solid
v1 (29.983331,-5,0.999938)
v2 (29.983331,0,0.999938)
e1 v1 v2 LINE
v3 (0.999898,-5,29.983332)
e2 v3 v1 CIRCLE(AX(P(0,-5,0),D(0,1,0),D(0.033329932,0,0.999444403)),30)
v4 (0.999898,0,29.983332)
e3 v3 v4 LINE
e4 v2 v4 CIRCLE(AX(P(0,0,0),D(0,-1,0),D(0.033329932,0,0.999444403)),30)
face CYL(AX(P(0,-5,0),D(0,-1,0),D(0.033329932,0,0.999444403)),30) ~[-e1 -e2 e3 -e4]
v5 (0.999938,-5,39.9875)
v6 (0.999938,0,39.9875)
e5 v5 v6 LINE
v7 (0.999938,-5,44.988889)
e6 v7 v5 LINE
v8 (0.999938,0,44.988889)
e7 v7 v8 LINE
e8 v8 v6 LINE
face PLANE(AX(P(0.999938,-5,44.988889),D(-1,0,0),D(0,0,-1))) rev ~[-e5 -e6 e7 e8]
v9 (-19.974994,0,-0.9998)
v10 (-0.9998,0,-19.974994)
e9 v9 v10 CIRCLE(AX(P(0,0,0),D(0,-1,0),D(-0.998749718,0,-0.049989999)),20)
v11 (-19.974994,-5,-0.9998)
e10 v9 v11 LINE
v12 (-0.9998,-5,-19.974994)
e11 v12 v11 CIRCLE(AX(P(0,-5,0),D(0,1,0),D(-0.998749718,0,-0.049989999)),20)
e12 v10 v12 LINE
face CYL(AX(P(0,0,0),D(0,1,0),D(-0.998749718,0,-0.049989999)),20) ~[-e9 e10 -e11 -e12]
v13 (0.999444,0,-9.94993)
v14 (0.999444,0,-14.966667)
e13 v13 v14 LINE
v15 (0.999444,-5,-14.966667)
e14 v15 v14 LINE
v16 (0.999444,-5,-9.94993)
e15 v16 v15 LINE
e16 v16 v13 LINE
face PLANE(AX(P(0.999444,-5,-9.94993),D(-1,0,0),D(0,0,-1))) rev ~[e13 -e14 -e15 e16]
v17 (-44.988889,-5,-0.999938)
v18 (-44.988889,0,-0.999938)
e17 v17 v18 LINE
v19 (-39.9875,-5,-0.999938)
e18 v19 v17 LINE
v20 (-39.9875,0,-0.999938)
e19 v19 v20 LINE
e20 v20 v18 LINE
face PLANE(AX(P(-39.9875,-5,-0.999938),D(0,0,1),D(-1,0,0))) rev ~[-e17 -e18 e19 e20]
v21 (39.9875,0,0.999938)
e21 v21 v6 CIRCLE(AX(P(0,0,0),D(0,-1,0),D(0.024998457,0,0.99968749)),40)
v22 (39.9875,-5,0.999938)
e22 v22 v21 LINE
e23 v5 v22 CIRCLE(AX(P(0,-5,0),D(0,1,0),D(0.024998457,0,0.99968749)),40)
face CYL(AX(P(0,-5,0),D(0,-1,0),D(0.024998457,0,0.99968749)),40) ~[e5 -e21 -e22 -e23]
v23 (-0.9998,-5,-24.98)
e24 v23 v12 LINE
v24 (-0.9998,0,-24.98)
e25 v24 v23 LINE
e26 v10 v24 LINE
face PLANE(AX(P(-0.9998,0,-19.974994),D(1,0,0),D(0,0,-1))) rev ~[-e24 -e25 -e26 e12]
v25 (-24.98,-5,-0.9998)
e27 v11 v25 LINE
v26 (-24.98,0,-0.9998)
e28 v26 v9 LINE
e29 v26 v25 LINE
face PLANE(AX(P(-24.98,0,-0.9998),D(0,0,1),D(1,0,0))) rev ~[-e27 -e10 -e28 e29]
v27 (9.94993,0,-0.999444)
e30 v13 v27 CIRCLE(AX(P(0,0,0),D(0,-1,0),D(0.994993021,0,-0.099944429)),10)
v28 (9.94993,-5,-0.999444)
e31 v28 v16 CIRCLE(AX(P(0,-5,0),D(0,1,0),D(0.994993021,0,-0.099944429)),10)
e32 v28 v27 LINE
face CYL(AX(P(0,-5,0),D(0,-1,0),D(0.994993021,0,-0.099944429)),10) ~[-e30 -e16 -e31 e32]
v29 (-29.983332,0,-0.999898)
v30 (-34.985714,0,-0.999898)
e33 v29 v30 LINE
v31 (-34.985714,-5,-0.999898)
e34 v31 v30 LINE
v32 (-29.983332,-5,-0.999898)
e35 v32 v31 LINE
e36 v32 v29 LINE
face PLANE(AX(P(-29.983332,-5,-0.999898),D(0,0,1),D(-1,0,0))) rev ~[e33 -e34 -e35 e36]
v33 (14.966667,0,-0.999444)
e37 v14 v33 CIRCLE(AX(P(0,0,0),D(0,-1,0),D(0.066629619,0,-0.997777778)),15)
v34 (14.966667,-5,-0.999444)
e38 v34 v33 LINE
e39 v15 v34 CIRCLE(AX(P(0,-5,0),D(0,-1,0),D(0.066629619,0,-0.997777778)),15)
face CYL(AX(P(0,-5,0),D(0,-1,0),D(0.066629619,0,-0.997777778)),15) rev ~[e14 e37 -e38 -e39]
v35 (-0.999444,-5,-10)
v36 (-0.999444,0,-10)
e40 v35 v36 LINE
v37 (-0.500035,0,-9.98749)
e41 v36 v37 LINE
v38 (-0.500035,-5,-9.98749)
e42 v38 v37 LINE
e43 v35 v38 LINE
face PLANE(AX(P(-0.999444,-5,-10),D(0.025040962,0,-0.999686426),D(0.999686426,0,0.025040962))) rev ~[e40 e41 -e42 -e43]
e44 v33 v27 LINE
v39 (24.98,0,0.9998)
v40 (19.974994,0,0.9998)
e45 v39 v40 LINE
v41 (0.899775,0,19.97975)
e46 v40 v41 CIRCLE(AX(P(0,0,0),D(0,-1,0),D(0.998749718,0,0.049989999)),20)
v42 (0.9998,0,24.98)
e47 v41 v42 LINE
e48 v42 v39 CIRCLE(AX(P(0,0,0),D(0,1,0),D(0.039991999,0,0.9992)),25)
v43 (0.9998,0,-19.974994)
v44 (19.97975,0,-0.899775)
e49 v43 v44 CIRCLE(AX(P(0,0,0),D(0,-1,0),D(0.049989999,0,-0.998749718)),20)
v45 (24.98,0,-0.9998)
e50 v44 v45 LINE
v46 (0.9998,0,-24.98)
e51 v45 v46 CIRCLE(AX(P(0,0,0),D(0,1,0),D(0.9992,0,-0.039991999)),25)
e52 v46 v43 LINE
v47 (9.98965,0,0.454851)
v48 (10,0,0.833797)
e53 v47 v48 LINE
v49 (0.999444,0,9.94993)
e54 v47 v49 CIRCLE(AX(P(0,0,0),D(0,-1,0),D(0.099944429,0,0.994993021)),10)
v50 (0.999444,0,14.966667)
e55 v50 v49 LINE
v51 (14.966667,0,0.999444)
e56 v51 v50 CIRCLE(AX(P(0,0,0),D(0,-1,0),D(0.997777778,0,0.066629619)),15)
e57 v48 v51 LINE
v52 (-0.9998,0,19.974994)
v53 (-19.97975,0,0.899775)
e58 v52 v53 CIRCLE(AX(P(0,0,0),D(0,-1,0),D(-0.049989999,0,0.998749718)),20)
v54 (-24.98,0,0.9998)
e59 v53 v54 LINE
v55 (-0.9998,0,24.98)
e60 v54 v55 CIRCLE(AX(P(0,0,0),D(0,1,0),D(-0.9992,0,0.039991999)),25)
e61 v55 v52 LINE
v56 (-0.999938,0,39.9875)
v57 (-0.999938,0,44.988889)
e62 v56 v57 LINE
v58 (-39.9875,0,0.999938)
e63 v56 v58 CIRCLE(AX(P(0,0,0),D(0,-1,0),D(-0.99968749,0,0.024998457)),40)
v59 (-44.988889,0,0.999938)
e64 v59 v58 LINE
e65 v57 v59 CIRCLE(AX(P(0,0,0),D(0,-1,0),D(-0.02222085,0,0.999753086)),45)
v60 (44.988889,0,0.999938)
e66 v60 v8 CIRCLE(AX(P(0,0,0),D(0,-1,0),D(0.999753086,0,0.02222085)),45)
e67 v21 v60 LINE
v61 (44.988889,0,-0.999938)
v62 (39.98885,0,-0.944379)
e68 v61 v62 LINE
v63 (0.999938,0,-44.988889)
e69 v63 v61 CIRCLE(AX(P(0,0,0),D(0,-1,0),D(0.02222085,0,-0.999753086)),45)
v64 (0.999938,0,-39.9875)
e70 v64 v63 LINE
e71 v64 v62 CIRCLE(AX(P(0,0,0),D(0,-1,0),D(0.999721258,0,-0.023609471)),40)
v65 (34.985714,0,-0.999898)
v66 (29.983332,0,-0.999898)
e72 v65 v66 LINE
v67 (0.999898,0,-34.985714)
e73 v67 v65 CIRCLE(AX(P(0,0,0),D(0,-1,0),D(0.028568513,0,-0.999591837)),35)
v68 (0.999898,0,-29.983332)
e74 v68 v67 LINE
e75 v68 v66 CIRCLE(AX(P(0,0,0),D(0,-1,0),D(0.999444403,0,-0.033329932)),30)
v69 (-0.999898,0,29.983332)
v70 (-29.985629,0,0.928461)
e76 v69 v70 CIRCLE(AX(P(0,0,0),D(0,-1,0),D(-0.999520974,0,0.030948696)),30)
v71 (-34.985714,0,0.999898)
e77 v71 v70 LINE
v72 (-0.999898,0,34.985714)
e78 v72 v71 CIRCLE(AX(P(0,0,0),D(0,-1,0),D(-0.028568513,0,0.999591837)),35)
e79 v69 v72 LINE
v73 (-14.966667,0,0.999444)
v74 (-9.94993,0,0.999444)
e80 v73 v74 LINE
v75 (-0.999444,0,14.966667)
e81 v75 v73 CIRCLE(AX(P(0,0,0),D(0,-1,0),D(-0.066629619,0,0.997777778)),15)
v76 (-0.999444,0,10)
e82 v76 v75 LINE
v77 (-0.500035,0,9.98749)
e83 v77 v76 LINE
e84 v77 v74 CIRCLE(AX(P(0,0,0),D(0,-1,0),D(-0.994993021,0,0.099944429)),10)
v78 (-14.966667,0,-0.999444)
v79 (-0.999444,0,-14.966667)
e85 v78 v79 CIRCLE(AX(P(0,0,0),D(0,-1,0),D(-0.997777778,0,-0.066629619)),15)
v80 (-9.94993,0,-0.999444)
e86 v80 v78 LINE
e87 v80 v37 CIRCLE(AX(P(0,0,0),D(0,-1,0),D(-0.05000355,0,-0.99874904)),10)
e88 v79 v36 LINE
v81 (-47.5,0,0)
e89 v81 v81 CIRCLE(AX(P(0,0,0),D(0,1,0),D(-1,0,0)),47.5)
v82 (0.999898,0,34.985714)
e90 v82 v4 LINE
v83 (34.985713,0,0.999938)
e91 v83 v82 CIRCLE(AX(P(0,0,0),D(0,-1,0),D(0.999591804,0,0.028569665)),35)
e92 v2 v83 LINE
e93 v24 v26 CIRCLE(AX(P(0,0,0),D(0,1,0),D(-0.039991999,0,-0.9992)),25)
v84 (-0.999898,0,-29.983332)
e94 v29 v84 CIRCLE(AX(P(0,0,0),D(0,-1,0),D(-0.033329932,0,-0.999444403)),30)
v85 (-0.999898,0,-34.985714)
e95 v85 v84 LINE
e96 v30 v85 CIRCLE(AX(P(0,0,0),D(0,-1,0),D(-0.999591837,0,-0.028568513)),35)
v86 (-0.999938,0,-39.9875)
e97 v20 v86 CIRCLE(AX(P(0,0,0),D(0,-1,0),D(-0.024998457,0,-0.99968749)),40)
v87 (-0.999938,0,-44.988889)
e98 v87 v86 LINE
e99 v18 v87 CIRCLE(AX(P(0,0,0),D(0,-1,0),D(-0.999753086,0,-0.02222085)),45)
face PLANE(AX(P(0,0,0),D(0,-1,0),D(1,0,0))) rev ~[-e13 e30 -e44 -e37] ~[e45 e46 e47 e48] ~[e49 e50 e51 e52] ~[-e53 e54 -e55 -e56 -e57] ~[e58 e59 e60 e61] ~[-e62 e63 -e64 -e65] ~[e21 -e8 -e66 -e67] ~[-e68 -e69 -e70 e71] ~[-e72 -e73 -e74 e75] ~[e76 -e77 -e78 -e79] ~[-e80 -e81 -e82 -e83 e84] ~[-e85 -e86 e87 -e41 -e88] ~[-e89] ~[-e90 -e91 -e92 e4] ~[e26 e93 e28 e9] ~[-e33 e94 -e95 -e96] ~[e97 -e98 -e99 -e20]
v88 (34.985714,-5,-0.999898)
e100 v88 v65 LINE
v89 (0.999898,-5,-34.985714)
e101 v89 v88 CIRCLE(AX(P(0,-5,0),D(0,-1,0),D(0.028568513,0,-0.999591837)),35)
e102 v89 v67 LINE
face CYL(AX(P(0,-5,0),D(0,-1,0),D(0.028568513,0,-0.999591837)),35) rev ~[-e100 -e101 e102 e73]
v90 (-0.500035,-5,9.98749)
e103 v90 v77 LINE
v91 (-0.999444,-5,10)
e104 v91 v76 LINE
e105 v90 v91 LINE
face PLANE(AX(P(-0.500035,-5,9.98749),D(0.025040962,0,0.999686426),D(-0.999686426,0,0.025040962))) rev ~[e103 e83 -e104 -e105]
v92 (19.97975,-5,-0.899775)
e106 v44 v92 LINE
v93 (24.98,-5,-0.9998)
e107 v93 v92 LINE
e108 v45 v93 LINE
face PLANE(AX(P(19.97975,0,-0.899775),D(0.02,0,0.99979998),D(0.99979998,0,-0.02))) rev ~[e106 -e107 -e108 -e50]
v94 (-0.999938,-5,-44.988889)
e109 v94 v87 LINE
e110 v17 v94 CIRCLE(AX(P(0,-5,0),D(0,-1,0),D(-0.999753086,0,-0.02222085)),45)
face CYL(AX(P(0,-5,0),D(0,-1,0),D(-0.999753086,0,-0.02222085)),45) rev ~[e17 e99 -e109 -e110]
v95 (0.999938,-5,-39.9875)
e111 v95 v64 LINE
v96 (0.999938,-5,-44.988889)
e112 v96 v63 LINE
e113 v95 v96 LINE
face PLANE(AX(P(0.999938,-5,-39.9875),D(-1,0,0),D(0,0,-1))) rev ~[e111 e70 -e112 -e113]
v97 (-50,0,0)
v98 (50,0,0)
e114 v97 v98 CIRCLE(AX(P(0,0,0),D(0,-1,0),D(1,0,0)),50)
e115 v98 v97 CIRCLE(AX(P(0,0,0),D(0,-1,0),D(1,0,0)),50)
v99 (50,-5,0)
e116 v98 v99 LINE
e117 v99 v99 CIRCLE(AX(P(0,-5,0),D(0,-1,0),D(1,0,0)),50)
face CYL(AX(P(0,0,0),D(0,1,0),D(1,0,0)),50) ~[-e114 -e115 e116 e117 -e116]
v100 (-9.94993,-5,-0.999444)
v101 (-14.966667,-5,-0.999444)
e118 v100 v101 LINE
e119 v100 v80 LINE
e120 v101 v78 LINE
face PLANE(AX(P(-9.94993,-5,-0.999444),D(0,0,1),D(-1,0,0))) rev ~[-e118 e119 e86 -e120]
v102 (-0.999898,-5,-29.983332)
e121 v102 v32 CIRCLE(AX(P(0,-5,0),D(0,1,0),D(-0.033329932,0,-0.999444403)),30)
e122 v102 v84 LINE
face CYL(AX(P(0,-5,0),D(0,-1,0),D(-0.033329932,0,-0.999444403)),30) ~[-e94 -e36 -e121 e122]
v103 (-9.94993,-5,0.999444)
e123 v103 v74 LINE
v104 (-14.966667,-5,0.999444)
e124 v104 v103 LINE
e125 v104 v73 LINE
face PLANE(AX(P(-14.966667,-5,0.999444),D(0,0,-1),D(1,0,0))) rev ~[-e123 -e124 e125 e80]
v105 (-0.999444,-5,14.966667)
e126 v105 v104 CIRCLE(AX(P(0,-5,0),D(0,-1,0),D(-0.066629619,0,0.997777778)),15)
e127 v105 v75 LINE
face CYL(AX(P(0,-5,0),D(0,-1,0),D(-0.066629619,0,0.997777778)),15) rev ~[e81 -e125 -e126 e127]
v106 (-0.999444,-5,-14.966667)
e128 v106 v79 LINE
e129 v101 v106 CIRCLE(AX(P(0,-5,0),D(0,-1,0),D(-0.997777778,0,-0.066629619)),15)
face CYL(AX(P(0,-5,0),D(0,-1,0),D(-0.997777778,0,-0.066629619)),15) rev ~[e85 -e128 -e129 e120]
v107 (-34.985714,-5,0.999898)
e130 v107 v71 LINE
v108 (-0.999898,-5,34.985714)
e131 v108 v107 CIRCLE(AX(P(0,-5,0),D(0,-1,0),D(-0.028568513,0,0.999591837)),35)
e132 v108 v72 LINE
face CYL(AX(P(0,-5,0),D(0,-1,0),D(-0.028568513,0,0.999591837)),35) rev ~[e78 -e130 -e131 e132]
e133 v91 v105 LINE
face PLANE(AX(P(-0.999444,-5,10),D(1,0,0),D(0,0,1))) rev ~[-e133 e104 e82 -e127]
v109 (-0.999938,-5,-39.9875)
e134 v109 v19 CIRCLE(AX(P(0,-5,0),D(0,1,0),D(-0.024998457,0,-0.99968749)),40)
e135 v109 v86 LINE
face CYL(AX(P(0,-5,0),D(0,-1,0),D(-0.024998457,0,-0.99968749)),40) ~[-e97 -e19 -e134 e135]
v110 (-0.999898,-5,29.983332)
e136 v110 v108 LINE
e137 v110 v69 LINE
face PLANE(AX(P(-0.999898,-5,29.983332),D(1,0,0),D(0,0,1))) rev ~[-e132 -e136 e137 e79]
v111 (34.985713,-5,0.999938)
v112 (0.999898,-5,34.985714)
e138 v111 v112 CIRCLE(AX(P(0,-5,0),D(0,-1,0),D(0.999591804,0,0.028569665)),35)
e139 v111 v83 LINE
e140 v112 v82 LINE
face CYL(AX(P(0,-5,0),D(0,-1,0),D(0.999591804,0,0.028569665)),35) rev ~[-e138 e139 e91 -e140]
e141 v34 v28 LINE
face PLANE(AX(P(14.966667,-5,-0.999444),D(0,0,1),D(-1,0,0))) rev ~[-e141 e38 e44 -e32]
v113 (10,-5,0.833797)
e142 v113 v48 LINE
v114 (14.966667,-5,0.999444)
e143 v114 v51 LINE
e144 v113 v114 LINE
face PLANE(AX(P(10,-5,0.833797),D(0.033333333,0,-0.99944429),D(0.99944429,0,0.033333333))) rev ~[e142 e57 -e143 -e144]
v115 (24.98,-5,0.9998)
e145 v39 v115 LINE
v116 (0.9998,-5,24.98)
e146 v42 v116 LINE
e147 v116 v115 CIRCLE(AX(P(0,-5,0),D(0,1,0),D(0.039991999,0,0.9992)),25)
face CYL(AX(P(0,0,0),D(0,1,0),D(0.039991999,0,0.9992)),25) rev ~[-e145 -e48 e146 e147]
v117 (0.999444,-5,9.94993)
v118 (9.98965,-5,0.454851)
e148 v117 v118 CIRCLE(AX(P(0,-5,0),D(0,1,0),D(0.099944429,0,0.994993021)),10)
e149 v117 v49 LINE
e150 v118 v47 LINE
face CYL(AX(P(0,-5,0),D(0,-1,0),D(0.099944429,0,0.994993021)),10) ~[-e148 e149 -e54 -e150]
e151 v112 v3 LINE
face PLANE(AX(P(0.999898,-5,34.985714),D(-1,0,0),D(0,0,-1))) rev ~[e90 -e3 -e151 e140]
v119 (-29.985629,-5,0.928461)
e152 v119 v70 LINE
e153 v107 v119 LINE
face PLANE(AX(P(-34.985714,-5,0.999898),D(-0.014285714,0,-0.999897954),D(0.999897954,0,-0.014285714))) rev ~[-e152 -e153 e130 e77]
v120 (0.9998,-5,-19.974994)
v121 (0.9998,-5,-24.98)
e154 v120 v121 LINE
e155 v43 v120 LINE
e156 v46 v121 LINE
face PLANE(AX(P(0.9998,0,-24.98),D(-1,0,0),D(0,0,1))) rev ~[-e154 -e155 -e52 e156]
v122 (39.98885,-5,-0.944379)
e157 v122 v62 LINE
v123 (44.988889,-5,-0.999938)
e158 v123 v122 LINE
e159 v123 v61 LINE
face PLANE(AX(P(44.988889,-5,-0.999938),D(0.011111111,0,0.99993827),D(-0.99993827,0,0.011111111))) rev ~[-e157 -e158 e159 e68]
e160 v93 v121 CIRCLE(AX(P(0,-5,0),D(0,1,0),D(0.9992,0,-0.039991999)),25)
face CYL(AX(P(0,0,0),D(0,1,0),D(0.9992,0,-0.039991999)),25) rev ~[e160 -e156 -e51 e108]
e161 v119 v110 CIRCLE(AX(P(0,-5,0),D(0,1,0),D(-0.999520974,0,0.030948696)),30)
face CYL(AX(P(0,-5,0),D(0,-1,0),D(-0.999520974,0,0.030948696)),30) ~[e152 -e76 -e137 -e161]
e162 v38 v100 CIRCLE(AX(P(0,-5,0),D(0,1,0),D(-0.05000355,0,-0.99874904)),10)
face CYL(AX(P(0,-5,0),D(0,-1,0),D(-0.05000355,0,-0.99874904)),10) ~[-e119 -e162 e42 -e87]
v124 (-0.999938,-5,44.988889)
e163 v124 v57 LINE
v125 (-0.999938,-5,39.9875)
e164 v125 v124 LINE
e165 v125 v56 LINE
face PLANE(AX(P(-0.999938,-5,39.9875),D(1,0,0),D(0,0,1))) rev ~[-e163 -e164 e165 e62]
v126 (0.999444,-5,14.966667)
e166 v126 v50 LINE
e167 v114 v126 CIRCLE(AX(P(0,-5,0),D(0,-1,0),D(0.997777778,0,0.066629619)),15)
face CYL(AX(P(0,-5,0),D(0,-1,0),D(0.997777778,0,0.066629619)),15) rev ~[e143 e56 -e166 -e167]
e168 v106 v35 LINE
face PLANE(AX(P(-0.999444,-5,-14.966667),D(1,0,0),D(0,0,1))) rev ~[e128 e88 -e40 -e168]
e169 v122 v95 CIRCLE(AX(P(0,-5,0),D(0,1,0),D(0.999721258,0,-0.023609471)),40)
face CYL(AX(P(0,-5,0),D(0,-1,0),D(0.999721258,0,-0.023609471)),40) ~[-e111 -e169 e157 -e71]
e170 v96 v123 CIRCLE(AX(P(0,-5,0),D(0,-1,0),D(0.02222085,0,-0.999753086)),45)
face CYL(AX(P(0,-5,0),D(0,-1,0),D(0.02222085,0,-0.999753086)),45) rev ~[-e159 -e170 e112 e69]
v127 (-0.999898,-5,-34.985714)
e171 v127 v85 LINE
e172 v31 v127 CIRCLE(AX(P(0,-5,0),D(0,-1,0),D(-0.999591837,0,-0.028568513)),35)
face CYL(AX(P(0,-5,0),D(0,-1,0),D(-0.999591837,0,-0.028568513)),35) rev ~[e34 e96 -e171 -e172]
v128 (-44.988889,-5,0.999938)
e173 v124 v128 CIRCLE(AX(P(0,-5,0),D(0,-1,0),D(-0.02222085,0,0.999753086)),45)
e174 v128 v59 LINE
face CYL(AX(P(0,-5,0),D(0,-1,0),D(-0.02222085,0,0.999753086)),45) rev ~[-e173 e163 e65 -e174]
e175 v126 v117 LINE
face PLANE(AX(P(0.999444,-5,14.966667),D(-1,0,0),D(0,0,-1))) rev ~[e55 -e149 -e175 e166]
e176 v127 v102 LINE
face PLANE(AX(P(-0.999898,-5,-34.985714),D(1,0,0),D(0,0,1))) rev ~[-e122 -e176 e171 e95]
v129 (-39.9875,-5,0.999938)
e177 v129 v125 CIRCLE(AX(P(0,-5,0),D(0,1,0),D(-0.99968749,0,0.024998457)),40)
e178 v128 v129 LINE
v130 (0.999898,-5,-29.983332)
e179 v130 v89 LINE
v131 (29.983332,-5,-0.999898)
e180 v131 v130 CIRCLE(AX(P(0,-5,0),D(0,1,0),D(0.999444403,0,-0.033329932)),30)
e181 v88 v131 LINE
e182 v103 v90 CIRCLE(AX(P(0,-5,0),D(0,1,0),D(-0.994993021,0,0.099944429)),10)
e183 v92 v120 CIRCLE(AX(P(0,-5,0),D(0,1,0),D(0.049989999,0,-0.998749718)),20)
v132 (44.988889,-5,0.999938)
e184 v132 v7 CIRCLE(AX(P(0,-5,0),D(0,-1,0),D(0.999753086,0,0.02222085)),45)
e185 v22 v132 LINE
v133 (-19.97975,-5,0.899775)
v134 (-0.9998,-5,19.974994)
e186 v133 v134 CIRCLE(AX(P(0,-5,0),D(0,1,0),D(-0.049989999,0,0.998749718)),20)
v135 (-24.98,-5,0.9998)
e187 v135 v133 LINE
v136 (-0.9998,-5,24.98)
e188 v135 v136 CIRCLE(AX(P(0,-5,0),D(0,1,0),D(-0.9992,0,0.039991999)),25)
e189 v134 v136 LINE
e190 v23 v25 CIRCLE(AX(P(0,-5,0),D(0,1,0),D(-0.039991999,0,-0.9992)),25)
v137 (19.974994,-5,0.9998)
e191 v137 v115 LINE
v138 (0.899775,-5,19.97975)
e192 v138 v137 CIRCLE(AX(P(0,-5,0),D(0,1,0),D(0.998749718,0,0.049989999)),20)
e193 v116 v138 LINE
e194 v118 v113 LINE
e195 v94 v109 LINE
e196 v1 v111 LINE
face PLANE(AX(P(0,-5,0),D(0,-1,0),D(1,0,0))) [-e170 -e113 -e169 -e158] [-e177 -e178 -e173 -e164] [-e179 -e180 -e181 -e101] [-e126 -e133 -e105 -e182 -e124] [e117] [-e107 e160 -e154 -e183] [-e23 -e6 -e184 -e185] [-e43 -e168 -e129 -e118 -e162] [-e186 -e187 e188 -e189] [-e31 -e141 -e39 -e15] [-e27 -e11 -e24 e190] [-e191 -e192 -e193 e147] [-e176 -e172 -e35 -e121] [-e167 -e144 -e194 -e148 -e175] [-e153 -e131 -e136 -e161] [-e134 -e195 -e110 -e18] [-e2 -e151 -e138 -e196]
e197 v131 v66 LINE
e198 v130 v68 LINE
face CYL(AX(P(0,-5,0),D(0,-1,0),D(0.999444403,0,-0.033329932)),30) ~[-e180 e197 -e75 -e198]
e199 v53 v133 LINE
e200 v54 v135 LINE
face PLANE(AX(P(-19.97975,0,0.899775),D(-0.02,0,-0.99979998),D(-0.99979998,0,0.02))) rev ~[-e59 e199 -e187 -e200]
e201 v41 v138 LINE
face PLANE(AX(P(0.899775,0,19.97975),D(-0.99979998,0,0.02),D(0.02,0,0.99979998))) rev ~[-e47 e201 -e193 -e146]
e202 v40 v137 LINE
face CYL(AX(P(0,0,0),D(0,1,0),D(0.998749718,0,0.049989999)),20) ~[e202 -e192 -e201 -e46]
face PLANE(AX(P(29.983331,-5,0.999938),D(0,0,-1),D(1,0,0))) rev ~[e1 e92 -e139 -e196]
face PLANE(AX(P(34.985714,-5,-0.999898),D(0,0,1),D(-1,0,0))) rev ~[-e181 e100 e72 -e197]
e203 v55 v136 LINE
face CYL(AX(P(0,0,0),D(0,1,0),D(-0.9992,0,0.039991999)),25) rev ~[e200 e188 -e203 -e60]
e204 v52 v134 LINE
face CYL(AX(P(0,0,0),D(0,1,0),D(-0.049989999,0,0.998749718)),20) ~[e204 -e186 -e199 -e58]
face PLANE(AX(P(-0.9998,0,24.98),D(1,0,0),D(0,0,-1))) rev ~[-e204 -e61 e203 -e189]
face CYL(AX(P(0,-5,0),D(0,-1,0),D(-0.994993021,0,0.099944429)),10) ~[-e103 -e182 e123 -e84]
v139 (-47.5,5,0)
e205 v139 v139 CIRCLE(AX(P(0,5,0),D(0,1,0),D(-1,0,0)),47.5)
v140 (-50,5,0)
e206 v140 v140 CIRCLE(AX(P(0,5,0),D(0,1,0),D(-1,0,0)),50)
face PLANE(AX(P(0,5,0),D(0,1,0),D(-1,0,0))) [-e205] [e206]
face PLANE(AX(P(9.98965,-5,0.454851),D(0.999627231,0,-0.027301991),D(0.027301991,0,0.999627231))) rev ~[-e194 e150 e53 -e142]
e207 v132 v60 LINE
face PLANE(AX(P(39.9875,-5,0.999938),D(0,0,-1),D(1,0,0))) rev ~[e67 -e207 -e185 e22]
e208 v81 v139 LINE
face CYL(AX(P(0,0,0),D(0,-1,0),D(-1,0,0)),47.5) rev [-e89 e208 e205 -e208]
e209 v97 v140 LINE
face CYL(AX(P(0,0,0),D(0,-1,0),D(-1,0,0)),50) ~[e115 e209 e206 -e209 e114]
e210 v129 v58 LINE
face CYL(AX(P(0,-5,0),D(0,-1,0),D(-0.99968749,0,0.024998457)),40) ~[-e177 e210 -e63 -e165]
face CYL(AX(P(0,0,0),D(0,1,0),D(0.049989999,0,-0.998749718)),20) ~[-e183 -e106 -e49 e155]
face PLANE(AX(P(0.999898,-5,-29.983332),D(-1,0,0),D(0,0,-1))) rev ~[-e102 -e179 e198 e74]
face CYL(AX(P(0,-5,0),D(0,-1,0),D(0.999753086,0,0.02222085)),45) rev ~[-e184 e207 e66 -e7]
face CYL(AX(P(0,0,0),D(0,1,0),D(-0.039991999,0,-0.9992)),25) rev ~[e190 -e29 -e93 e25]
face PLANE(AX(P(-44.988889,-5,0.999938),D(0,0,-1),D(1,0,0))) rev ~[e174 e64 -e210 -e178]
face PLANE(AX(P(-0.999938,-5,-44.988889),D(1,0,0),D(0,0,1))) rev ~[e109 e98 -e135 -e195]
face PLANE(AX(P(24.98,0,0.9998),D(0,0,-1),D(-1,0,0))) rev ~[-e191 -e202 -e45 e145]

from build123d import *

# Parameters (mm, degrees)
F0_R      = 50
F1_DEPTH  = 5
F3_DEPTH  = 25
F5_DEPTH  = 25
F7_DEPTH  = 25
F9_DEPTH  = 25
F10_R     = 50
F10_R_2   = 47.5
F11_DEPTH = 5


with BuildPart() as f1:
    # F0 (on Front) → F1 (new body)
    with BuildSketch(Plane.XZ):
        Circle(F0_R)
    extrude(amount=F1_DEPTH)

    # F2 (on face) → F3 (cut)
    with BuildSketch(Plane.XZ.offset(5)):
        with BuildLine():
            Line((39.98749959, 0.9999382697), (44.9888888889, 0.9999382697))
            ThreePointArc((44.9888888889, 0.9999382697), (31.8198051534, 31.8198051534), (0.9999382697, 44.9888888889))
            Line((0.9999382697, 44.9888888889), (0.9999382697, 39.98749959))
            ThreePointArc((0.9999382697, 39.98749959), (28.2842712475, 28.2842712475), (39.98749959, 0.9999382697))
        make_face()
        with BuildLine():
            ThreePointArc((0.9999382697, -44.9888888889), (31.8198051534, -31.8198051534), (44.9888888889, -0.9999382697))
            Line((44.9888888889, -0.9999382697), (39.9888503033, -0.9443788557))
            ThreePointArc((39.9888503033, -0.9443788557), (28.3039134456, -28.2646153992), (0.9999382697, -39.98749959))
            Line((0.9999382697, -39.98749959), (0.9999382697, -44.9888888889))
        make_face()
        with BuildLine():
            Line((-0.9999382697, 39.98749959), (-0.9999382697, 44.9888888889))
            ThreePointArc((-0.9999382697, 44.9888888889), (-31.8198051534, 31.8198051534), (-44.9888888889, 0.9999382697))
            Line((-44.9888888889, 0.9999382697), (-39.98749959, 0.9999382697))
            ThreePointArc((-39.98749959, 0.9999382697), (-28.2842712475, 28.2842712475), (-0.9999382697, 39.98749959))
        make_face()
        with BuildLine():
            ThreePointArc((-44.9888888889, -0.9999382697), (-31.8198051534, -31.8198051534), (-0.9999382697, -44.9888888889))
            Line((-0.9999382697, -44.9888888889), (-0.9999382697, -39.98749959))
            ThreePointArc((-0.9999382697, -39.98749959), (-28.2842712475, -28.2842712475), (-39.98749959, -0.9999382697))
            Line((-39.98749959, -0.9999382697), (-44.9888888889, -0.9999382697))
        make_face()
    extrude(amount=-F3_DEPTH, mode=Mode.SUBTRACT)

    # F4 (on face) → F5 (cut)
    with BuildSketch(Plane.XZ.offset(5)):
        with BuildLine():
            Line((-0.999897954, 29.9833321044), (-0.999897954, 34.9857142857))
            ThreePointArc((-0.999897954, 34.9857142857), (-24.7487373415, 24.7487373415), (-34.9857142857, 0.999897954))
            Line((-34.9857142857, 0.999897954), (-29.9856292313, 0.9284608776))
            ThreePointArc((-29.9856292313, 0.9284608776), (-21.2384582595, 21.1879185094), (-0.999897954, 29.9833321044))
        make_face()
        with BuildLine():
            Line((-29.9833321044, -0.999897954), (-34.9857142857, -0.999897954))
            ThreePointArc((-34.9857142857, -0.999897954), (-24.7487373415, -24.7487373415), (-0.999897954, -34.9857142857))
            Line((-0.999897954, -34.9857142857), (-0.999897954, -29.9833321044))
            ThreePointArc((-0.999897954, -29.9833321044), (-21.2132034356, -21.2132034356), (-29.9833321044, -0.999897954))
        make_face()
        with BuildLine():
            ThreePointArc((0.999897954, -34.9857142857), (24.7487373415, -24.7487373415), (34.9857142857, -0.999897954))
            Line((34.9857142857, -0.999897954), (29.9833321044, -0.999897954))
            ThreePointArc((29.9833321044, -0.999897954), (21.2132034356, -21.2132034356), (0.999897954, -29.9833321044))
            Line((0.999897954, -29.9833321044), (0.999897954, -34.9857142857))
        make_face()
        with BuildLine():
            ThreePointArc((34.9857131335, 0.9999382697), (24.7487230819, 24.7487516011), (0.999897954, 34.9857142857))
            Line((0.999897954, 34.9857142857), (0.999897954, 29.9833321044))
            ThreePointArc((0.999897954, 29.9833321044), (21.2131891739, 21.2132176973), (29.9833307599, 0.9999382697))
            Line((29.9833307599, 0.9999382697), (34.9857131335, 0.9999382697))
        make_face()
    extrude(amount=-F5_DEPTH, mode=Mode.SUBTRACT)

    # F6 (on face) → F7 (cut)
    with BuildSketch(Plane(origin=(0, 0, 0), x_dir=(-1, 0, 0), z_dir=(0, 1, 0))):
        with BuildLine():
            Line((19.9797498734, 0.8997749705), (24.98, 0.99979998))
            ThreePointArc((24.98, 0.99979998), (17.6776695297, 17.6776695297), (0.99979998, 24.98))
            Line((0.99979998, 24.98), (0.99979998, 19.974994368))
            ThreePointArc((0.99979998, 19.974994368), (14.1774954339, 14.106687181), (19.9797498734, 0.8997749705))
        make_face()
        with BuildLine():
            ThreePointArc((0.99979998, -24.98), (17.6776695297, -17.6776695297), (24.98, -0.99979998))
            Line((24.98, -0.99979998), (19.974994368, -0.99979998))
            ThreePointArc((19.974994368, -0.99979998), (14.1421356237, -14.1421356237), (0.99979998, -19.974994368))
            Line((0.99979998, -19.974994368), (0.99979998, -24.98))
        make_face()
        with BuildLine():
            ThreePointArc((-24.98, -0.99979998), (-17.6776695297, -17.6776695297), (-0.99979998, -24.98))
            Line((-0.99979998, -24.98), (-0.99979998, -19.974994368))
            ThreePointArc((-0.99979998, -19.974994368), (-14.1774954339, -14.106687181), (-19.9797498734, -0.8997749705))
            Line((-19.9797498734, -0.8997749705), (-24.98, -0.99979998))
        make_face()
        with BuildLine():
            Line((-0.8997749705, 19.9797498734), (-0.99979998, 24.98))
            ThreePointArc((-0.99979998, 24.98), (-17.6776695297, 17.6776695297), (-24.98, 0.99979998))
            Line((-24.98, 0.99979998), (-19.974994368, 0.99979998))
            ThreePointArc((-19.974994368, 0.99979998), (-14.106687181, 14.1774954339), (-0.8997749705, 19.9797498734))
        make_face()
    extrude(amount=-F7_DEPTH, mode=Mode.SUBTRACT)

    # F8 (on face) → F9 (cut)
    with BuildSketch(Plane.XZ.offset(5)):
        with BuildLine():
            Line((-0.99944429, 10), (-0.99944429, 14.9666666667))
            ThreePointArc((-0.99944429, 14.9666666667), (-10.6066017178, 10.6066017178), (-14.9666666667, 0.99944429))
            Line((-14.9666666667, 0.99944429), (-9.9499302063, 0.99944429))
            ThreePointArc((-9.9499302063, 0.99944429), (-6.8917841678, 7.2459168492), (-0.5000354957, 9.9874904006))
            Line((-0.5000354957, 9.9874904006), (-0.99944429, 10))
        make_face()
        with BuildLine():
            Line((10, 0.8337966825), (14.9666666667, 0.99944429))
            ThreePointArc((14.9666666667, 0.99944429), (10.6066017178, 10.6066017178), (0.99944429, 14.9666666667))
            Line((0.99944429, 14.9666666667), (0.99944429, 9.9499302063))
            ThreePointArc((0.99944429, 9.9499302063), (7.2614861704, 6.8753777058), (9.989650171, 0.4548510314))
            Line((9.989650171, 0.4548510314), (10, 0.8337966825))
        make_face()
        with BuildLine():
            ThreePointArc((0.99944429, -14.9666666667), (10.6066017178, -10.6066017178), (14.9666666667, -0.99944429))
            Line((14.9666666667, -0.99944429), (9.9499302063, -0.99944429))
            ThreePointArc((9.9499302063, -0.99944429), (7.0710678119, -7.0710678119), (0.99944429, -9.9499302063))
            Line((0.99944429, -9.9499302063), (0.99944429, -14.9666666667))
        make_face()
        with BuildLine():
            ThreePointArc((-14.9666666667, -0.99944429), (-10.6066017178, -10.6066017178), (-0.99944429, -14.9666666667))
            Line((-0.99944429, -14.9666666667), (-0.99944429, -10))
            Line((-0.99944429, -10), (-0.5000354957, -9.9874904006))
            ThreePointArc((-0.5000354957, -9.9874904006), (-6.8917841678, -7.2459168492), (-9.9499302063, -0.99944429))
            Line((-9.9499302063, -0.99944429), (-14.9666666667, -0.99944429))
        make_face()
    extrude(amount=-F9_DEPTH, mode=Mode.SUBTRACT)

    # F10 (on face) → F11 (join)
    with BuildSketch(Plane(origin=(0, 0, 0), x_dir=(-1, 0, 0), z_dir=(0, 1, 0))):
        Circle(F10_R)
        Circle(F10_R_2, mode=Mode.SUBTRACT)
    extrude(amount=F11_DEPTH)


solid = f1.part
